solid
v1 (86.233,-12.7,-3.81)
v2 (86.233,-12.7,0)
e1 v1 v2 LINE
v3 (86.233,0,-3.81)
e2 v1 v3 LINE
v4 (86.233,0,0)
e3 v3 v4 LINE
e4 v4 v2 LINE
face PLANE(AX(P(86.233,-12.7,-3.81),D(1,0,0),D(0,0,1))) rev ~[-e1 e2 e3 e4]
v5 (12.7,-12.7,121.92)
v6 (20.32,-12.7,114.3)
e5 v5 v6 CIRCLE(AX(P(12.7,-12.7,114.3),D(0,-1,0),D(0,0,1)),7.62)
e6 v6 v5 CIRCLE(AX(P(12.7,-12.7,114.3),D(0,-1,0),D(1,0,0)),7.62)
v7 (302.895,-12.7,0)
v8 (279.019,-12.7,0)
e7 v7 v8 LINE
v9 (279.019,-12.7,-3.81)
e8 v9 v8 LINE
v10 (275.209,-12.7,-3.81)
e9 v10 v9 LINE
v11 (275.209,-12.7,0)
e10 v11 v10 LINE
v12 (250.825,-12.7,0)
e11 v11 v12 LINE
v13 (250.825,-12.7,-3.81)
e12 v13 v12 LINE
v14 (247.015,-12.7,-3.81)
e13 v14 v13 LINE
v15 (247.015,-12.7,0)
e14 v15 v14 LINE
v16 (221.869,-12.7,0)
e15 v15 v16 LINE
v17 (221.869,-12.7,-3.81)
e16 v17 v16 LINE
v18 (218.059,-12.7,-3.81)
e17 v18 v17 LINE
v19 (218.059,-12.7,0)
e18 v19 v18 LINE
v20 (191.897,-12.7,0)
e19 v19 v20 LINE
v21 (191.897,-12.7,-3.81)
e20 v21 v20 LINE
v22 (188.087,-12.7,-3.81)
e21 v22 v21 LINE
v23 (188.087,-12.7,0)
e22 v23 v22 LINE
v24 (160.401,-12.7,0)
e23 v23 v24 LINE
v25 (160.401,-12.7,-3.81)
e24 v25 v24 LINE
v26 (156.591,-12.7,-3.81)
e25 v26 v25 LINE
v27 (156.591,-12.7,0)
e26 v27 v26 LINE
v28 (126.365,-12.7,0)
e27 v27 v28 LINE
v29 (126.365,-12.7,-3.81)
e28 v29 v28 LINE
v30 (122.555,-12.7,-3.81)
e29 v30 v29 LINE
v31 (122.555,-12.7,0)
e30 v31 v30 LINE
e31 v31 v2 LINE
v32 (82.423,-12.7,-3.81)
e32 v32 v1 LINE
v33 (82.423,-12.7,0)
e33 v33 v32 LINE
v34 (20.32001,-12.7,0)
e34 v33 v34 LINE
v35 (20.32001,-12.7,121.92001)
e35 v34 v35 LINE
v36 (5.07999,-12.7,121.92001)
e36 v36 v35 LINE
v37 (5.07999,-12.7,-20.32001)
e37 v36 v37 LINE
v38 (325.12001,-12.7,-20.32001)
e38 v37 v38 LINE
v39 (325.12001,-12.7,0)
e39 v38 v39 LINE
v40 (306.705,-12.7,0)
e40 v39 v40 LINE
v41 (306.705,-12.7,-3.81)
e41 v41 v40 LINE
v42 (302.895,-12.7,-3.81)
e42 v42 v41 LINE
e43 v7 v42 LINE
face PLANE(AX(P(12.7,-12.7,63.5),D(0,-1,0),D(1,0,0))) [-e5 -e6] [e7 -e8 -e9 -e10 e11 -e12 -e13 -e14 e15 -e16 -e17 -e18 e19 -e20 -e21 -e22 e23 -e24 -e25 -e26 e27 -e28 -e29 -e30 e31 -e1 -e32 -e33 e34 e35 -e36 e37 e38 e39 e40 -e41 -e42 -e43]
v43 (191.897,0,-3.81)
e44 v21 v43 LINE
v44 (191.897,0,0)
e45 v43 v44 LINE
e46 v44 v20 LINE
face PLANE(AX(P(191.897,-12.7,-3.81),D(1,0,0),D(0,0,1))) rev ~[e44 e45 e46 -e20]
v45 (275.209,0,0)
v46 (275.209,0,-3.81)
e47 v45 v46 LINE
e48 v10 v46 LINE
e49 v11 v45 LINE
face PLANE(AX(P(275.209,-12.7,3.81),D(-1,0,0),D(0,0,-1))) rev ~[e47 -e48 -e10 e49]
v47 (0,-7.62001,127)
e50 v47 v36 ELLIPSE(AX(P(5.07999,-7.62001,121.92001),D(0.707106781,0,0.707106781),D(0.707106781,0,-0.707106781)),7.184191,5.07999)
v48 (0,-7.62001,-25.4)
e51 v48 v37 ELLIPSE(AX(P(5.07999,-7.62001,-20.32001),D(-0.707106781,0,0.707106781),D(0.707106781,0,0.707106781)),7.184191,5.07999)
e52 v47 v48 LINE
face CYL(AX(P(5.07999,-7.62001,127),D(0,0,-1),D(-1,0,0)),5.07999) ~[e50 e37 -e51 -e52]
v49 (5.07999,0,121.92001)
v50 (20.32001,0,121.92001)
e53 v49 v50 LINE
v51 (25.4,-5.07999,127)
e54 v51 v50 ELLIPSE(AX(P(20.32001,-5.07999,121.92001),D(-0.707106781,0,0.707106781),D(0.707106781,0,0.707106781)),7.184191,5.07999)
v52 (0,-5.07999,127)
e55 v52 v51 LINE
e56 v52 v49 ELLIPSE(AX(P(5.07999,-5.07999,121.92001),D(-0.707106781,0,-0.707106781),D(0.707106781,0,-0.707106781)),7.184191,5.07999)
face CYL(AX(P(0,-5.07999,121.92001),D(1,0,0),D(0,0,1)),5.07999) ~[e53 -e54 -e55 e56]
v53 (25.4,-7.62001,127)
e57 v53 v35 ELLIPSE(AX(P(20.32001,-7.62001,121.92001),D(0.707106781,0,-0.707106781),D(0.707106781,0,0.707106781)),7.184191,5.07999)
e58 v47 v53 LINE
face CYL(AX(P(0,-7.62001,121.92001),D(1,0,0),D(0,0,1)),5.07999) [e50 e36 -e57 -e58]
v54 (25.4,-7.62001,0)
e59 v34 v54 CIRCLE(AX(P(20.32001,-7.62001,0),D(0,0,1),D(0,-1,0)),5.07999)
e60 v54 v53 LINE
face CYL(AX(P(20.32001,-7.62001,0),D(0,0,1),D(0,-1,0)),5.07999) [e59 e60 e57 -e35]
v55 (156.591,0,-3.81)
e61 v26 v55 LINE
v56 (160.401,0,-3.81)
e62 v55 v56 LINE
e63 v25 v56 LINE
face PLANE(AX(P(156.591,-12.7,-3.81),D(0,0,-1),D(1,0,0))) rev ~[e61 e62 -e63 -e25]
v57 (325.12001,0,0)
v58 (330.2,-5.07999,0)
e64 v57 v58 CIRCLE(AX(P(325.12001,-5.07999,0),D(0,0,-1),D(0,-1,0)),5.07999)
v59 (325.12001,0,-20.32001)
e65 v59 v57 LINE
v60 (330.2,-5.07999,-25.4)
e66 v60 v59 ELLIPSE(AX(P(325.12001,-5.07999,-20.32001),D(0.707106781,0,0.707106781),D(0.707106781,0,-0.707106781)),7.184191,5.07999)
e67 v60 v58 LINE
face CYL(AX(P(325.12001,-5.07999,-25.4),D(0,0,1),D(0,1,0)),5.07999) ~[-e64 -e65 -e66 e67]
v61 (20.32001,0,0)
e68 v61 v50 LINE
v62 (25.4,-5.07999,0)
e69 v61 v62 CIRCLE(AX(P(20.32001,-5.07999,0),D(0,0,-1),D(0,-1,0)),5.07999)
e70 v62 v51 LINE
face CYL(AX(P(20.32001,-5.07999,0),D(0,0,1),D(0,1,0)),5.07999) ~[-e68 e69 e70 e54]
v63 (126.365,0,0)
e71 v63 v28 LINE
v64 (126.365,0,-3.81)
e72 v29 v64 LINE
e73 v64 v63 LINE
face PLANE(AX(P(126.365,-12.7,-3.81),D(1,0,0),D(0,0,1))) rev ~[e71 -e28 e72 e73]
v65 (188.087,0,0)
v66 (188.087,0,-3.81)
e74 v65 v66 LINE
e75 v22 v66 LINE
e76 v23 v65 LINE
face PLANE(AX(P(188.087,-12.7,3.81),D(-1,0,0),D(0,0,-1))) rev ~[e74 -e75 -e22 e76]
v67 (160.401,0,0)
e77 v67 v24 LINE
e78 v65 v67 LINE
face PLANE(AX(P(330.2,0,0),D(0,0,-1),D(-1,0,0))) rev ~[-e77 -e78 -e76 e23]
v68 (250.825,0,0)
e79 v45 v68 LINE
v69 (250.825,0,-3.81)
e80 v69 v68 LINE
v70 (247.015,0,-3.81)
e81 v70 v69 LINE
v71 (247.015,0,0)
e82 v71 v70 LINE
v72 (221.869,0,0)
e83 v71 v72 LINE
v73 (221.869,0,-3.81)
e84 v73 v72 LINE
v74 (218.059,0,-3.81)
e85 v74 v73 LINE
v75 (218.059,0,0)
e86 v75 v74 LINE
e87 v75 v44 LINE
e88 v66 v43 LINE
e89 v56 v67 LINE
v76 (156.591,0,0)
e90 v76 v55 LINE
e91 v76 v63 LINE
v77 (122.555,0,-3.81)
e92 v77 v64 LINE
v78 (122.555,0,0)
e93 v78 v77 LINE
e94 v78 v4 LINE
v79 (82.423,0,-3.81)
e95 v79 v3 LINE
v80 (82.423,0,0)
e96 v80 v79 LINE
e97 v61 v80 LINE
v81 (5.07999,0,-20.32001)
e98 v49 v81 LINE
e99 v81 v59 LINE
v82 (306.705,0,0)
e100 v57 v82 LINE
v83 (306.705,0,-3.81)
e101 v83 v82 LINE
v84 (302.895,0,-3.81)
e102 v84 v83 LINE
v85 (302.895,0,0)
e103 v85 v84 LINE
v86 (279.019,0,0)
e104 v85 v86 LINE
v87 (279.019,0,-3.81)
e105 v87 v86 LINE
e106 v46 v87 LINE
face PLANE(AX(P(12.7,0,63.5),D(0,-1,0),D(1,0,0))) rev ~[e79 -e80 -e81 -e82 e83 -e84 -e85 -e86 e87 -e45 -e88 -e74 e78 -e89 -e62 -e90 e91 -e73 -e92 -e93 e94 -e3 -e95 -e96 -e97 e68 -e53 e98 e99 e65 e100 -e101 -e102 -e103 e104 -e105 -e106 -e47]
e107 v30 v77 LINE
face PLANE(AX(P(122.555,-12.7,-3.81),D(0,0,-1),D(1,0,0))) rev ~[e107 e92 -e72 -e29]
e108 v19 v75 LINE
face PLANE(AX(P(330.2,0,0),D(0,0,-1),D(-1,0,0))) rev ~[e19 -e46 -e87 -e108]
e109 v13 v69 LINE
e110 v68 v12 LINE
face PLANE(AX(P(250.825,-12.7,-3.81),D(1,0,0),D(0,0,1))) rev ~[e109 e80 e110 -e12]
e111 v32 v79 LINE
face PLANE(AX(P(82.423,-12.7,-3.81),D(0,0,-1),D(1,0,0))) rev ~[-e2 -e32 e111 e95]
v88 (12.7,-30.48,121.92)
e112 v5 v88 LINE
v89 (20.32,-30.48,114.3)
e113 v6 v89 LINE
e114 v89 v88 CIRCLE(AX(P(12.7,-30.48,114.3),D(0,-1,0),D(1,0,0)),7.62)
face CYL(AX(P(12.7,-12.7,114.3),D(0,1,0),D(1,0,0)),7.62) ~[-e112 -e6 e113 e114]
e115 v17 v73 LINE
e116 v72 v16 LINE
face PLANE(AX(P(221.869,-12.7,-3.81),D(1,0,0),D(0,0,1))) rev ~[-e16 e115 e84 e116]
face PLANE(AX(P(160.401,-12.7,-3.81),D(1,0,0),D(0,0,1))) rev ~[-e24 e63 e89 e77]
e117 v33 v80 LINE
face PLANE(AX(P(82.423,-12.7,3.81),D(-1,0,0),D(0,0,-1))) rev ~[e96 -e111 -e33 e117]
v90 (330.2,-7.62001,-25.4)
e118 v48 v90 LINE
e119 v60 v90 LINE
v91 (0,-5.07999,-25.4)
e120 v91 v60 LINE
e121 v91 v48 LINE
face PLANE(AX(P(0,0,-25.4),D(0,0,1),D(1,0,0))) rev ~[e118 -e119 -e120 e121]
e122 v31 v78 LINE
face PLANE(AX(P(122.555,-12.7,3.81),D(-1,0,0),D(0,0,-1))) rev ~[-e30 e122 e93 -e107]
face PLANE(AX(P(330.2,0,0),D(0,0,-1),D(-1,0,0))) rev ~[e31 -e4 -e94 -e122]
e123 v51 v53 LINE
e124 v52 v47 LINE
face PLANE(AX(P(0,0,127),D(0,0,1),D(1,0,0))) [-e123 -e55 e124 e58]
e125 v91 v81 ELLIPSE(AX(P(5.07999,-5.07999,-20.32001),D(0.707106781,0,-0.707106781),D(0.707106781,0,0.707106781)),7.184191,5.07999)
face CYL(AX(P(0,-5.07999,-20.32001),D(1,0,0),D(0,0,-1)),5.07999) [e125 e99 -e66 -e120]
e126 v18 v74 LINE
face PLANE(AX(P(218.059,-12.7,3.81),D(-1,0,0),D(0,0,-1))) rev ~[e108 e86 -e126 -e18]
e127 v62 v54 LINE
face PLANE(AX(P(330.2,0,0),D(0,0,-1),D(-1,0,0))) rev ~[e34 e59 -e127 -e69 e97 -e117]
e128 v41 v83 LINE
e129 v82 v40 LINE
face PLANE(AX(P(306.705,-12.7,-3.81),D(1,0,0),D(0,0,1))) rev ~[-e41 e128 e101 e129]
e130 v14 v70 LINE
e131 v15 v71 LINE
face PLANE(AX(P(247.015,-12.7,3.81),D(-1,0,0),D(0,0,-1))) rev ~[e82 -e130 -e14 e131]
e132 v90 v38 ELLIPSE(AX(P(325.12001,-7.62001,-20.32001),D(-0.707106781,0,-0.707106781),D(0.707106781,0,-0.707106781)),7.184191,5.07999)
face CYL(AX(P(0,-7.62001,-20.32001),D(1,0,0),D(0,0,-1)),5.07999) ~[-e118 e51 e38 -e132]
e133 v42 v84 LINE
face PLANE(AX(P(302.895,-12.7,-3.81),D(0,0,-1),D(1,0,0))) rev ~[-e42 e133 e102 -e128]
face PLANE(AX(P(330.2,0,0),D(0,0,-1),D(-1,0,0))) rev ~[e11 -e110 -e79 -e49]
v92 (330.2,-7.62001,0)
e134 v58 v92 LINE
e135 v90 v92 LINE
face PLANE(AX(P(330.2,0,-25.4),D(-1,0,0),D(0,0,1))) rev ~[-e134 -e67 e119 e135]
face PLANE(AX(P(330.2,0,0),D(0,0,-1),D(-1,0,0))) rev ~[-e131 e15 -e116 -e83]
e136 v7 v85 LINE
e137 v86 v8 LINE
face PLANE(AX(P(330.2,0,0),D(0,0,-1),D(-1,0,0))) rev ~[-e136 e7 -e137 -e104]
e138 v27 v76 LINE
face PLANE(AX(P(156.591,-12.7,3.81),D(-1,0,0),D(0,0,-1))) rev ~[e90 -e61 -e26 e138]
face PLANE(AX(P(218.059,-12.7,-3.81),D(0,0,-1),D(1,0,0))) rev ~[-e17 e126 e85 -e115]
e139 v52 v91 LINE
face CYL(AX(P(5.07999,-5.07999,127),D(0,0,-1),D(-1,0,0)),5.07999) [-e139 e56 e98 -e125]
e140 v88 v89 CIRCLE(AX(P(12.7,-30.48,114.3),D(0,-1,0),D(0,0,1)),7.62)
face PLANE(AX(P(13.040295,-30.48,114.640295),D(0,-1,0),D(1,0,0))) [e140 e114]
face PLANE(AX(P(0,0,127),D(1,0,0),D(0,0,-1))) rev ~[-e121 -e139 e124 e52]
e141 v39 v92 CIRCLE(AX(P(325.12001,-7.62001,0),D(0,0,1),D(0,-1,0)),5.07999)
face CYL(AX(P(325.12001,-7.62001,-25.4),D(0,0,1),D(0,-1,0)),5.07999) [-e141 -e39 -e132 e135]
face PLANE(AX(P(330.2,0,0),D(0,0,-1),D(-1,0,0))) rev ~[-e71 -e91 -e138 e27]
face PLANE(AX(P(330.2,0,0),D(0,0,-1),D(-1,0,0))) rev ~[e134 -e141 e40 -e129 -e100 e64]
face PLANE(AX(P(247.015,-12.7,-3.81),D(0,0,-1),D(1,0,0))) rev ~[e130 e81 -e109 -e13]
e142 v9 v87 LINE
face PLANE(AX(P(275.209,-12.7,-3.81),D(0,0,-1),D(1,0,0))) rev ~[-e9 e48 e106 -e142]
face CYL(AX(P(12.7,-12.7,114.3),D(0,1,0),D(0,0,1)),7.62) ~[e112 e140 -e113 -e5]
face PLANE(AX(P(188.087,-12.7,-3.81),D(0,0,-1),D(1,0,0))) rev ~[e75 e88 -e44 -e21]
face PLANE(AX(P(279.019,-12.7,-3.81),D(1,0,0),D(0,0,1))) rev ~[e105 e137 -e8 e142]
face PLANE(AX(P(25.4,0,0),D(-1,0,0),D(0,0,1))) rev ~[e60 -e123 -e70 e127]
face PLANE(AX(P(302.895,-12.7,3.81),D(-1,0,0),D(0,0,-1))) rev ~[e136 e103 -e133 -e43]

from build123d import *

# Parameters (mm, degrees)
F0_W     = 25.4
F0_H     = 127
F1_DEPTH = 12.7
F3_DEPTH = 17.78
F5_DEPTH = 25.4
F6_R     = 5.07999


# Not quite as in the source:
# - a fillet or chamfer is up to 0.001 mm smaller than in the source, because OpenCascade refuses the exact size


with BuildPart() as f1:
    # F0 (on Front) → F1 (new body)
    with BuildSketch(Plane.XZ):
        with Locations((12.7, 63.5)):
            Rectangle(F0_W, F0_H)
        Polygon((25.4, 0), (0, 0), (0, -25.4), (330.2, -25.4), (330.2, 0), align=None)
    extrude(amount=F1_DEPTH)

    # F2 (on face) → F3 (join)
    with BuildSketch(Plane.XZ.offset(12.7)):
        with BuildLine():
            ThreePointArc((12.7, 121.92), (7.3118463274, 108.9118463274), (20.32, 114.3))
            ThreePointArc((20.32, 114.3), (18.0881536726, 119.6881536726), (12.7, 121.92))
        make_face()
    extrude(amount=F3_DEPTH)

    # F4 (on face) → F5 (cut)
    with BuildSketch(Plane.XZ.offset(12.7)):
        Polygon((82.423, 3.81), (82.423, 0), (84.328, 0), (86.233, 0), (86.233, 3.81), align=None)
        Polygon((84.328, 0), (82.423, 0), (82.423, -3.81), (86.233, -3.81), (86.233, 0), align=None)
        Polygon((302.895, 3.81), (302.895, 0), (302.895, -3.81), (306.705, -3.81), (306.705, 3.81), align=None)
        Polygon((275.209, 3.81), (275.209, 0), (277.114, 0), (279.019, 0), (279.019, 3.81), align=None)
        Polygon((277.114, 0), (275.209, 0), (275.209, -3.81), (279.019, -3.81), (279.019, 0), align=None)
        Polygon((247.015, 3.81), (247.015, 0), (248.92, 0), (250.825, 0), (250.825, 3.81), align=None)
        Polygon((248.92, 0), (247.015, 0), (247.015, -3.81), (250.825, -3.81), (250.825, 0), align=None)
        Polygon((218.059, 3.81), (218.059, 0), (219.964, 0), (221.869, 0), (221.869, 3.81), align=None)
        Polygon((219.964, 0), (218.059, 0), (218.059, -3.81), (221.869, -3.81), (221.869, 0), align=None)
        Polygon((188.087, 3.81), (188.087, 0), (189.992, 0), (191.897, 0), (191.897, 3.81), align=None)
        Polygon((189.992, 0), (188.087, 0), (188.087, -3.81), (191.897, -3.81), (191.897, 0), align=None)
        Polygon((156.591, 3.81), (156.591, 0), (158.496, 0), (160.401, 0), (160.401, 3.81), align=None)
        Polygon((158.496, 0), (156.591, 0), (156.591, -3.81), (160.401, -3.81), (160.401, 0), align=None)
        Polygon((122.555, 3.81), (122.555, 0), (124.46, 0), (126.365, 0), (126.365, 3.81), align=None)
        Polygon((124.46, 0), (122.555, 0), (122.555, -3.81), (126.365, -3.81), (126.365, 0), align=None)
    extrude(amount=-F5_DEPTH, mode=Mode.SUBTRACT)

    # F6 (radius 5.08 in the source; OpenCascade refuses exactly that, so slightly less here)
    f6_edges = [f1.edges().sort_by_distance(p)[0] for p in [
        (165.1, -12.7, -25.4),
        (165.1, 0, -25.4),
        (0, 0, 50.8),
        (0, -12.7, 50.8),
        (12.7, 0, 127),
        (12.7, -12.7, 127),
        (25.4, 0, 63.5),
        (25.4, -12.7, 63.5),
        (330.2, 0, -12.7),
        (330.2, -12.7, -12.7),
    ]]
    fillet(f6_edges, radius=F6_R)


solid = f1.part
